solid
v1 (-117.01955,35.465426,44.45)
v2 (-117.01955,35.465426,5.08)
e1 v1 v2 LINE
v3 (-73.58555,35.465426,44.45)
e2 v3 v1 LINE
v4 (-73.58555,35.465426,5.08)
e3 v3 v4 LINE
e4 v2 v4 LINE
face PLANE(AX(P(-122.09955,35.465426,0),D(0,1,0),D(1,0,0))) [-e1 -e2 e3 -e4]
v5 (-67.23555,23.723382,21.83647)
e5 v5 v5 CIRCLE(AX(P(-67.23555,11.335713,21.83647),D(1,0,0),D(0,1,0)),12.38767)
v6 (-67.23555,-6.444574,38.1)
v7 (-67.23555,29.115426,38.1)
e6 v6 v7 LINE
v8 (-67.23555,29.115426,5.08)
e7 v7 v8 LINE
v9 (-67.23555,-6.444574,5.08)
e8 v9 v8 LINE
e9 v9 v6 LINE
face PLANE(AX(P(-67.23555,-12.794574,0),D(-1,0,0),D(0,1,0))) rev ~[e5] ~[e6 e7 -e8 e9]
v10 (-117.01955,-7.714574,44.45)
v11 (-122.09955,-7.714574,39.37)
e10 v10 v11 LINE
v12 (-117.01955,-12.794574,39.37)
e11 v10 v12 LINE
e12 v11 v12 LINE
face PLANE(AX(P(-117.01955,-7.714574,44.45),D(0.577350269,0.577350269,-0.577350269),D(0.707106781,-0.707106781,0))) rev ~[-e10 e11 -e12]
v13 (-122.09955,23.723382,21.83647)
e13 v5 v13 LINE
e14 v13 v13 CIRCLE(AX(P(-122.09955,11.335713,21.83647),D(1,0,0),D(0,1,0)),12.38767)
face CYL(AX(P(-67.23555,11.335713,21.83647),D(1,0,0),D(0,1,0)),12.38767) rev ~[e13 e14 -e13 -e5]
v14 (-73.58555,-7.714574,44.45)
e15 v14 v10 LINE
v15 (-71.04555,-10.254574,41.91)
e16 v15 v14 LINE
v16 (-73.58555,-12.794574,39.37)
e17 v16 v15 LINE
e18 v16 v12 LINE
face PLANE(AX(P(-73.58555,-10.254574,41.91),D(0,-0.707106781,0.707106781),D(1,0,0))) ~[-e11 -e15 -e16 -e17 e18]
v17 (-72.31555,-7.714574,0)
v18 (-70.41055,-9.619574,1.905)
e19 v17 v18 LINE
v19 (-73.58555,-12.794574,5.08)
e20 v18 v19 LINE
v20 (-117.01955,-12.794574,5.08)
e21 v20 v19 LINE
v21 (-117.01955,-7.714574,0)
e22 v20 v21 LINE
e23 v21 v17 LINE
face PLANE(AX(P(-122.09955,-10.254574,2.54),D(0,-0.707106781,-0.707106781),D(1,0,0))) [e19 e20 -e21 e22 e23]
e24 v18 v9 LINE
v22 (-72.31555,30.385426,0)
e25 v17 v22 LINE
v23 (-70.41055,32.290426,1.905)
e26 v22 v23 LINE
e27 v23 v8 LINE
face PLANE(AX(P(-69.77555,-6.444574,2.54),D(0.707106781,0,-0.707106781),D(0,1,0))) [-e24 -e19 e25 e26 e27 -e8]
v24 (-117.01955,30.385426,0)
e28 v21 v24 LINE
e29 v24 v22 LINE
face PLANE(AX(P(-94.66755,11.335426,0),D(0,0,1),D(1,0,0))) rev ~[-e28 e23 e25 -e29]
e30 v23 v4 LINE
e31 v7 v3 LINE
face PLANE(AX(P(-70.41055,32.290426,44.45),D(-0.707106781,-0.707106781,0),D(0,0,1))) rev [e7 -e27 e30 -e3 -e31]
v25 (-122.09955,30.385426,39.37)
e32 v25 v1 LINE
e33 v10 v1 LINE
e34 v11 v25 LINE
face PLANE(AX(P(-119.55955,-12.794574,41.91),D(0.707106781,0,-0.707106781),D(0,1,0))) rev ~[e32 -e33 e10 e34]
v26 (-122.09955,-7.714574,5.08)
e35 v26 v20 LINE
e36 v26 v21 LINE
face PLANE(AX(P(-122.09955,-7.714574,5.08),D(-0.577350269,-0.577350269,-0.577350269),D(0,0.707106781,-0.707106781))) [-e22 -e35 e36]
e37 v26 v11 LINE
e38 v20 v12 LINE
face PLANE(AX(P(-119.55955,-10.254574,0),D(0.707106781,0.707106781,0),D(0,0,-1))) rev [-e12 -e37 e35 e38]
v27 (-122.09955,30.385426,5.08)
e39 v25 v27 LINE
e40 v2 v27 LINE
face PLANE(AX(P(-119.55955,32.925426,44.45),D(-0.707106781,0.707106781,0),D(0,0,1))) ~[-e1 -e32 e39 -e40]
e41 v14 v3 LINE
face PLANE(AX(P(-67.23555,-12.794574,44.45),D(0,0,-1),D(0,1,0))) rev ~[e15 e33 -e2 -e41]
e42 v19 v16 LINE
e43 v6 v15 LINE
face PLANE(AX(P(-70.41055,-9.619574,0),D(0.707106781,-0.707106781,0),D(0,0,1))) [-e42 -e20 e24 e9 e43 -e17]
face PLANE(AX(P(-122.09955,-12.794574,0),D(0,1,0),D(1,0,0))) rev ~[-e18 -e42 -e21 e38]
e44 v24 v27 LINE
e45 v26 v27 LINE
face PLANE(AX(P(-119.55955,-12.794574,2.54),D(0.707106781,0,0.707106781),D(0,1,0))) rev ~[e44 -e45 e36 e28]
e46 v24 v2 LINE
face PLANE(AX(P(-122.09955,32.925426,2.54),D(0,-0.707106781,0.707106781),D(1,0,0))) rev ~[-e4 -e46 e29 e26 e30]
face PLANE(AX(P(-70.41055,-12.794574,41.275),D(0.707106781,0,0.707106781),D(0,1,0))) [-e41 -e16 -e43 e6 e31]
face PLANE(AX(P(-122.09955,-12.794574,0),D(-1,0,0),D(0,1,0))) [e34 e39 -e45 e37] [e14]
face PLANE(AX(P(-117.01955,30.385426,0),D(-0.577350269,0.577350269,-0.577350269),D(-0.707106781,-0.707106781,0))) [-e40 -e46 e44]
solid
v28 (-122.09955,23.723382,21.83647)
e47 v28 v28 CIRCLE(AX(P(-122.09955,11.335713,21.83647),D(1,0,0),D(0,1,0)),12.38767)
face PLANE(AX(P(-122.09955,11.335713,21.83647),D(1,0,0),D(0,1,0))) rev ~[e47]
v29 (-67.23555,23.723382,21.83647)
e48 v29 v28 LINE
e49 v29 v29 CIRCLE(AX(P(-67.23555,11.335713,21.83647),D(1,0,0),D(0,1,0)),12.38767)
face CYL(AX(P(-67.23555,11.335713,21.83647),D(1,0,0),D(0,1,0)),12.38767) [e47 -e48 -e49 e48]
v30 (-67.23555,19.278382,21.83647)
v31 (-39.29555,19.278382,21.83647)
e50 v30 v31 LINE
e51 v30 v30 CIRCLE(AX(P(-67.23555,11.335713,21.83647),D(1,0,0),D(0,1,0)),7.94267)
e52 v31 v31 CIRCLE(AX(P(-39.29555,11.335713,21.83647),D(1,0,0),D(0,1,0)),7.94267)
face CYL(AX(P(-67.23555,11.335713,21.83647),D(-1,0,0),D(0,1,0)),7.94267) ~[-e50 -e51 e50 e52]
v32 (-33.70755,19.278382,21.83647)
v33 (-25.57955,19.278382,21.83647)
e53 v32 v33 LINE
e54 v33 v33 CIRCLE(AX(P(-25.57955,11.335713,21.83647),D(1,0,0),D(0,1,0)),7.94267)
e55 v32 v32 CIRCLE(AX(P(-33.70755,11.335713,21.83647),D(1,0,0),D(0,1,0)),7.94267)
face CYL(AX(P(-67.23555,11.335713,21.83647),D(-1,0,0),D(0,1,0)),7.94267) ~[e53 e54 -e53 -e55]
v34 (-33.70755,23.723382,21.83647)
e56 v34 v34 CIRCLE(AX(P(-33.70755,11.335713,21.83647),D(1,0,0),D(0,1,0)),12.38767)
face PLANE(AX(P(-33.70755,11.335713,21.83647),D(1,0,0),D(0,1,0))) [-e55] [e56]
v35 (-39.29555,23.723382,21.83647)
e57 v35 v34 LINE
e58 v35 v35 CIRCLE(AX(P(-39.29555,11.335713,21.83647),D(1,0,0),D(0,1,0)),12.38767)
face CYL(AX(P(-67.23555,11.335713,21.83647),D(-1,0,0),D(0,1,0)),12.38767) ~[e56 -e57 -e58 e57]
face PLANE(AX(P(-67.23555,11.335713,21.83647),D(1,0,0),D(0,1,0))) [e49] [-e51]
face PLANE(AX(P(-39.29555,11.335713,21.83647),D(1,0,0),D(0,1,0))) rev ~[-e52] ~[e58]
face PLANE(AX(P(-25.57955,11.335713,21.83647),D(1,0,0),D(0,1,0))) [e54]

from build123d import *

# Parameters (mm, degrees)
F0_W     = 54.864
F0_H     = 48.26
F1_DEPTH = 44.45
F2_R     = 7.9426697317
F3_DEPTH = 41.656
F2_R_2   = 12.3876697317
F4_DEPTH = 33.528
F5_DEPTH = 36.83
F6_DEPTH = 27.94
F2_W     = 48.26
F2_H     = 44.45
F7_DEPTH = 54.864
F8_DEPTH = 54.864
F9_SIZE  = 6.35
F10_SIZE = 5.08


with BuildPart() as f1:
    # F0 (on Top) → F1 (new body)
    with BuildSketch(Plane.XY):
        with Locations((-94.6675501764, 11.3354255426)):
            Rectangle(F0_W, F0_H)
    extrude(amount=F1_DEPTH)

    # F5 (cut): a face of the model
    f5_faces = [f1.faces().sort_by_distance(p)[0] for p in [
        (-94.6675501764, 11.3354255426, 44.45),
    ]]
    extrude(f5_faces, amount=-F5_DEPTH, mode=Mode.SUBTRACT)

    # F2 (on face) → F7 (join, through all)
    with BuildSketch(Plane.YZ.offset(-67.2355501764)):
        with Locations((11.3354255426, 22.225)):
            Rectangle(F2_W, F2_H)
        with Locations((11.3357125817, 21.8364697298)):
            Circle(F2_R_2, mode=Mode.SUBTRACT)
    extrude(amount=-F7_DEPTH)

    # F9
    f9_edges = [f1.edges().sort_by_distance(p)[0] for p in [
        (-67.23555, 11.335426, 44.45),
        (-67.23555, -12.794574, 22.225),
        (-67.23555, 35.465426, 22.225),
    ]]
    chamfer(f9_edges, length=F9_SIZE)

    # F10 (call 1 of 2: OpenCascade refuses the feature's edges together)
    f10_edges = [f1.edges().sort_by_distance(p)[0] for p in [
        (-97.84255, -12.794574, 0),
        (-122.09955, -12.794574, 22.225),
        (-122.09955, 11.335426, 44.45),
        (-122.09955, 35.465426, 22.225),
        (-97.84255, 35.465426, 0),
        (-122.09955, 11.335426, 0),
        (-97.84255, -12.794574, 44.45),
    ]]
    chamfer(f10_edges, length=F10_SIZE)

    # F10#2 (call 2 of 2)
    f10_2_edges = [f1.edges().sort_by_distance(p)[0] for p in [
        (-67.23555, 11.335426, 0),
    ]]
    chamfer(f10_2_edges, length=F10_SIZE)


with BuildPart() as f3:
    # F2 (on face) → F3 (new body)
    with BuildSketch(Plane.YZ.offset(-67.2355501764)):
        with Locations((11.3357125817, 21.8364697298)):
            Circle(F2_R)
    extrude(amount=F3_DEPTH)

    # F2 (on face) → F4 (join)
    with BuildSketch(Plane.YZ.offset(-67.2355501764)):
        with Locations((11.3357125817, 21.8364697298)):
            Circle(F2_R_2)
        with Locations((11.3357125817, 21.8364697298)):
            Circle(F2_R, mode=Mode.SUBTRACT)
    extrude(amount=F4_DEPTH)

    # F2 (on face) → F6 (cut)
    with BuildSketch(Plane.YZ.offset(-67.2355501764)):
        with Locations((11.3357125817, 21.8364697298)):
            Circle(F2_R_2)
        with Locations((11.3357125817, 21.8364697298)):
            Circle(F2_R, mode=Mode.SUBTRACT)
    extrude(amount=F6_DEPTH, mode=Mode.SUBTRACT)

    # F2 (on face) → F8 (join, through all)
    with BuildSketch(Plane.YZ.offset(-67.2355501764)):
        with Locations((11.3357125817, 21.8364697298)):
            Circle(F2_R_2)
        with Locations((11.3357125817, 21.8364697298)):
            Circle(F2_R, mode=Mode.SUBTRACT)
        with Locations((11.3357125817, 21.8364697298)):
            Circle(F2_R)
    extrude(amount=-F8_DEPTH)


solid = Compound([f1.part, f3.part])
